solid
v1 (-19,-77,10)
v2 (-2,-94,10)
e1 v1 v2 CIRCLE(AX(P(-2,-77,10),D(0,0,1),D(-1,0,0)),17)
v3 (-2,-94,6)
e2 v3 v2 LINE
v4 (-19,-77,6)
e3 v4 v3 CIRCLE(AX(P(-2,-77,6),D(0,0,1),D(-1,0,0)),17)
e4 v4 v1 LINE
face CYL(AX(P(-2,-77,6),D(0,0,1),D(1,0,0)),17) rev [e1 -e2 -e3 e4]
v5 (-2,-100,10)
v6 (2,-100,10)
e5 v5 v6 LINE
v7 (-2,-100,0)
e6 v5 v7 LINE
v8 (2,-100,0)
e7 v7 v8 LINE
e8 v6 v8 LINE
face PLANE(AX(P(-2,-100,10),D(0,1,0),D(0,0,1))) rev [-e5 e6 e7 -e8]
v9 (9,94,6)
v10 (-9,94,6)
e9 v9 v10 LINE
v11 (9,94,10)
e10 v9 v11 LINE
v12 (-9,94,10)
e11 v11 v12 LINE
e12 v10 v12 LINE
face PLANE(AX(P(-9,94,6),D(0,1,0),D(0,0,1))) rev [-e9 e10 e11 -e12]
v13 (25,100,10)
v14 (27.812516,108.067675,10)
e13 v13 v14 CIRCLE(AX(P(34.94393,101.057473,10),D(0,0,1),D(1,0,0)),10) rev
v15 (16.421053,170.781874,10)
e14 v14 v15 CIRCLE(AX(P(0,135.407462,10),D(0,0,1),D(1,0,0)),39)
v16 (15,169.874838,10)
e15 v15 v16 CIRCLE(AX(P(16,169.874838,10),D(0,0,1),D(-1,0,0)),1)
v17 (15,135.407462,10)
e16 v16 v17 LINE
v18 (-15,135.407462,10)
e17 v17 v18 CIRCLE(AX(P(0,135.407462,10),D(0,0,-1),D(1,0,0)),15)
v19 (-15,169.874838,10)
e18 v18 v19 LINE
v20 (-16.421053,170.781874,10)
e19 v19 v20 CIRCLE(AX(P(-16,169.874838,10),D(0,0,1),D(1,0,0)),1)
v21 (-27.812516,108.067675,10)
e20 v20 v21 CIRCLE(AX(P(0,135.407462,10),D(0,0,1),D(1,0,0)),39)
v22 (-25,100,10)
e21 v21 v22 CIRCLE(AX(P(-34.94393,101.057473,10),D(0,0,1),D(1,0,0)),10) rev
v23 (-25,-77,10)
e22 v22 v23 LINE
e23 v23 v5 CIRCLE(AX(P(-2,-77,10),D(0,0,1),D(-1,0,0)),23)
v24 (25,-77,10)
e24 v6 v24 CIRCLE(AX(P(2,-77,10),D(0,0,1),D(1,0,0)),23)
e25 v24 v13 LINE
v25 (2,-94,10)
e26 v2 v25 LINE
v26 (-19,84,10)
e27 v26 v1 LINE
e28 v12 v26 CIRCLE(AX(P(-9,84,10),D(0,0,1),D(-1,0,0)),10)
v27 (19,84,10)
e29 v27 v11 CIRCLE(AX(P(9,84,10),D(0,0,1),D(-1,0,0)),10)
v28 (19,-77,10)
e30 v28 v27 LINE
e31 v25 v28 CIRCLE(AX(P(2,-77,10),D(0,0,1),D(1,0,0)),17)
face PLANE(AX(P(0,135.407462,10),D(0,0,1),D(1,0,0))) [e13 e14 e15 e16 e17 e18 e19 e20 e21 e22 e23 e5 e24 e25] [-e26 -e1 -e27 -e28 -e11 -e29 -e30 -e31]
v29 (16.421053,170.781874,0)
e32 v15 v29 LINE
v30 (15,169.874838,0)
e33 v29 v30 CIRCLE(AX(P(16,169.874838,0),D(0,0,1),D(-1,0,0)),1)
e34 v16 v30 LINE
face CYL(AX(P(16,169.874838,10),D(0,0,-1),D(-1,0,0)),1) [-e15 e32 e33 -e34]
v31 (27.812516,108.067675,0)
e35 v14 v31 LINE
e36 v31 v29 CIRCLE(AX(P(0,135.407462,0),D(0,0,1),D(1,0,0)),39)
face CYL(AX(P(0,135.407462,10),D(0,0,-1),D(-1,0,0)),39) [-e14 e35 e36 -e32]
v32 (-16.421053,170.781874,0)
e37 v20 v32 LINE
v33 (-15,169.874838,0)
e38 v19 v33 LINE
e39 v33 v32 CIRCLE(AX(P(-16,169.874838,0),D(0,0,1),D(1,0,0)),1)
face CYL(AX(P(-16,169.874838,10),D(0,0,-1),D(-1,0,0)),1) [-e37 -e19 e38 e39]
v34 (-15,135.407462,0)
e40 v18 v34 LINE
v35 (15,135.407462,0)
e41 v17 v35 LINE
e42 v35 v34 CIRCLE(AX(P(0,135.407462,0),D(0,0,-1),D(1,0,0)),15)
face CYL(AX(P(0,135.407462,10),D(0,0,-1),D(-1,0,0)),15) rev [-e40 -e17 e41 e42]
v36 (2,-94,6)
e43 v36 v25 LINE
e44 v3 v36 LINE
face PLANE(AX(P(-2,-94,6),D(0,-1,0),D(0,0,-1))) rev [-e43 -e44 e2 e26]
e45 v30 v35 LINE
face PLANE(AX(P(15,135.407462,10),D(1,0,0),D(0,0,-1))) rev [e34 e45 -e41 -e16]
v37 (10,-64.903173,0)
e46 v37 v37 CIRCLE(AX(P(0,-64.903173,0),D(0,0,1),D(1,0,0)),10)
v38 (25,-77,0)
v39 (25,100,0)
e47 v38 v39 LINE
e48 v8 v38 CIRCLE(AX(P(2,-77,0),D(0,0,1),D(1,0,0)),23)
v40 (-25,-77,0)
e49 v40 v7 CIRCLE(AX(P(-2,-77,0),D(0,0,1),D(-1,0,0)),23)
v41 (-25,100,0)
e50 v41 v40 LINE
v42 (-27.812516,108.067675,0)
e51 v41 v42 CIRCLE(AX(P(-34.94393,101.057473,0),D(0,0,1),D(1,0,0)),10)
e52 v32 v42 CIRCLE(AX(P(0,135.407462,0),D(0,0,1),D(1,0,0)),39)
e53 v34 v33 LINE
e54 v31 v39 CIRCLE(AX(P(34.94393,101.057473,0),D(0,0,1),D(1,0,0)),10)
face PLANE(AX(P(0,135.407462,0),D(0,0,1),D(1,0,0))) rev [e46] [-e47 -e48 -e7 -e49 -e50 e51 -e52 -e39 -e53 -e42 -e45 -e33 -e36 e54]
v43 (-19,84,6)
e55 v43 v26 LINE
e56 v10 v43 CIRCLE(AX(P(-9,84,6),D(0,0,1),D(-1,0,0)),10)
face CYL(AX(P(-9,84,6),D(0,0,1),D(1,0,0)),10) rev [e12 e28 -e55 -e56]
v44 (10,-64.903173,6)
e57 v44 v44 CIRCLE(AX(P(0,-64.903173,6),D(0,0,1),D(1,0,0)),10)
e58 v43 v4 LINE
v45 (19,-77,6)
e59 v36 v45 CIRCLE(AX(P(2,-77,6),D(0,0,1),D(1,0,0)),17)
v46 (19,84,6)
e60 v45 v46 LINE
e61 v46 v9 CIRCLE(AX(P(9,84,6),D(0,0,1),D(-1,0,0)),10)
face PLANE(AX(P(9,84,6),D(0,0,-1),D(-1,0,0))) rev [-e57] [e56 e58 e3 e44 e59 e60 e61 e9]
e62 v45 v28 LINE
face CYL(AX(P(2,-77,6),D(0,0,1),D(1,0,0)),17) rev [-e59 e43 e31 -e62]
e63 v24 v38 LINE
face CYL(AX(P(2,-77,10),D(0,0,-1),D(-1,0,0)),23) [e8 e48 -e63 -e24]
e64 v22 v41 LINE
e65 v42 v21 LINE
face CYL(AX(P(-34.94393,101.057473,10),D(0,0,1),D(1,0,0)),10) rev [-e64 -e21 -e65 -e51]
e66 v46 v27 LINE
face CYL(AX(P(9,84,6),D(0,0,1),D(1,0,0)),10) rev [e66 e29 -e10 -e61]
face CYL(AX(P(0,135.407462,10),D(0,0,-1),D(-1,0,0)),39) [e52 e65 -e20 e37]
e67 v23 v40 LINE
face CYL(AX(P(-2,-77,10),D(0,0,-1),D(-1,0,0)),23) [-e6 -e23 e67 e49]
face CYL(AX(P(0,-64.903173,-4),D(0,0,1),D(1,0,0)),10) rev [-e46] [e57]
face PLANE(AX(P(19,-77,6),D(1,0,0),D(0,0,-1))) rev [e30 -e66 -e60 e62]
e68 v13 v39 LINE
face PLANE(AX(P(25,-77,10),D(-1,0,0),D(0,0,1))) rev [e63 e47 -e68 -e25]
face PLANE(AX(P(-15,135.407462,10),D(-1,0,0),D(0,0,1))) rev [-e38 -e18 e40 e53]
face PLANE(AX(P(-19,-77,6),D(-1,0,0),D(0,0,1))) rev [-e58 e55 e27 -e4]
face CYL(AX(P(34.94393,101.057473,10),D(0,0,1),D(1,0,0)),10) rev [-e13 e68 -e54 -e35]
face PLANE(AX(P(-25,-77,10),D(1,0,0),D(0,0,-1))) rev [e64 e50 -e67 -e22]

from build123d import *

# Parameters (mm, degrees)
SALIENTE_EXTRUIR1_DEPTH = 10
REDONDEO1_R             = 10
CORTAR_EXTRUIR1_DEPTH   = 4
CROQUIS4_R              = 10
CORTAR_EXTRUIR2_DEPTH   = 10


with BuildPart() as part:
    # Croquis1 → Saliente-Extruir1 (new body)
    with BuildSketch(Plane.XY):
        with BuildLine():
            Line((16.349667964, 100), (25, 100))
            Line((25, 100), (25, -77))
            ThreePointArc((25, -77), (18.263455967, -93.263455967), (2, -100))
            Line((2, -100), (-2, -100))
            ThreePointArc((-2, -100), (-18.263455967, -93.263455967), (-25, -77))
            Line((-25, -77), (-25, 100))
            Line((-25, 100), (-16.349667964, 100))
            ThreePointArc((-16.349667964, 100), (-38.999980166, 135.368129777), (-16.421052632, 170.781873976))
            ThreePointArc((-16.421052632, 170.781873976), (-15.461972413, 170.717764999), (-15, 169.874837769))
            Line((-15, 169.874837769), (-15, 135.40746189))
            ThreePointArc((-15, 135.40746189), (0, 120.40746189), (15, 135.40746189))
            Line((15, 135.40746189), (15, 169.874837769))
            ThreePointArc((15, 169.874837769), (15.461972413, 170.717764999), (16.421052632, 170.781873976))
            ThreePointArc((16.421052632, 170.781873976), (38.999980166, 135.368129777), (16.349667964, 100))
        make_face()
    extrude(amount=SALIENTE_EXTRUIR1_DEPTH)

    # Redondeo1
    # the kernel refuses this fillet: 10 mm, written as the material it adds along each edge
    with BuildSketch(Plane(origin=(-16.349667964, 100, 0), x_dir=(-1, 0, 0), z_dir=(0, 0, 1))) as redondeo1_piece_1:
        with BuildLine():
            CenterArc((18.594262382, -1.057473068), REDONDEO1_R, 173.929776198, 50.579134401)
            Line((11.462848025, -8.067674869), (11.320219738, -8.207878905))
            ThreePointArc((11.320219738, -8.207878905), (5.981746269, -3.678170401), (-0.083844451, -0.181576728))
            Line((-0.083844451, -0.181576728), (0, 0.2))
            ThreePointArc((0, 0.2), (4.325166018, 0.2), (8.451453429, 0.021149461))
            Line((8.451453429, 0.021149461), (8.650332036, 0))
        make_face()
    extrude(amount=10)
    with BuildSketch(Plane(origin=(16.349667964, 100, 0), x_dir=(0.8177652445483508, 0.5755519132178922, 0), z_dir=(0, 0, 1))) as redondeo1_piece_2:
        with BuildLine():
            CenterArc((15.814372171, -9.837198566), REDONDEO1_R, 100.352797219, 50.579134401)
            Line((7.073940893, -4.978715153), (6.899132268, -4.881545485))
            ThreePointArc((6.899132268, -4.881545485), (3.421860064, -2.652910626), (-0.115110383, -0.163553049))
            Line((-0.115110383, -0.163553049), (0.035941755, 0.196743971))
            ThreePointArc((0.035941755, 0.196743971), (7.008642212, -0.434925592), (13.98134267, 0.196743971))
            Line((13.98134267, 0.196743971), (14.017284425, 0))
        make_face()
    extrude(amount=10)

    # Croquis3 → Cortar-Extruir1 (cut)
    with BuildSketch(Plane.XY.offset(10)):
        with BuildLine():
            Line((-2, -94), (2, -94))
            ThreePointArc((2, -94), (14.02081528, -89.02081528), (19, -77))
            Line((19, -77), (19, 84))
            ThreePointArc((19, 84), (16.071067812, 91.071067812), (9, 94))
            Line((9, 94), (-9, 94))
            ThreePointArc((-9, 94), (-16.071067812, 91.071067812), (-19, 84))
            Line((-19, 84), (-19, -77))
            ThreePointArc((-19, -77), (-14.02081528, -89.02081528), (-2, -94))
        make_face()
    extrude(amount=-CORTAR_EXTRUIR1_DEPTH, mode=Mode.SUBTRACT)

    # Croquis4 → Cortar-Extruir2 (cut)
    with BuildSketch(Plane.XY.offset(6)):
        with Locations((0, -64.903172803)):
            Circle(CROQUIS4_R)
    extrude(amount=-CORTAR_EXTRUIR2_DEPTH, mode=Mode.SUBTRACT)


solid = part.part
